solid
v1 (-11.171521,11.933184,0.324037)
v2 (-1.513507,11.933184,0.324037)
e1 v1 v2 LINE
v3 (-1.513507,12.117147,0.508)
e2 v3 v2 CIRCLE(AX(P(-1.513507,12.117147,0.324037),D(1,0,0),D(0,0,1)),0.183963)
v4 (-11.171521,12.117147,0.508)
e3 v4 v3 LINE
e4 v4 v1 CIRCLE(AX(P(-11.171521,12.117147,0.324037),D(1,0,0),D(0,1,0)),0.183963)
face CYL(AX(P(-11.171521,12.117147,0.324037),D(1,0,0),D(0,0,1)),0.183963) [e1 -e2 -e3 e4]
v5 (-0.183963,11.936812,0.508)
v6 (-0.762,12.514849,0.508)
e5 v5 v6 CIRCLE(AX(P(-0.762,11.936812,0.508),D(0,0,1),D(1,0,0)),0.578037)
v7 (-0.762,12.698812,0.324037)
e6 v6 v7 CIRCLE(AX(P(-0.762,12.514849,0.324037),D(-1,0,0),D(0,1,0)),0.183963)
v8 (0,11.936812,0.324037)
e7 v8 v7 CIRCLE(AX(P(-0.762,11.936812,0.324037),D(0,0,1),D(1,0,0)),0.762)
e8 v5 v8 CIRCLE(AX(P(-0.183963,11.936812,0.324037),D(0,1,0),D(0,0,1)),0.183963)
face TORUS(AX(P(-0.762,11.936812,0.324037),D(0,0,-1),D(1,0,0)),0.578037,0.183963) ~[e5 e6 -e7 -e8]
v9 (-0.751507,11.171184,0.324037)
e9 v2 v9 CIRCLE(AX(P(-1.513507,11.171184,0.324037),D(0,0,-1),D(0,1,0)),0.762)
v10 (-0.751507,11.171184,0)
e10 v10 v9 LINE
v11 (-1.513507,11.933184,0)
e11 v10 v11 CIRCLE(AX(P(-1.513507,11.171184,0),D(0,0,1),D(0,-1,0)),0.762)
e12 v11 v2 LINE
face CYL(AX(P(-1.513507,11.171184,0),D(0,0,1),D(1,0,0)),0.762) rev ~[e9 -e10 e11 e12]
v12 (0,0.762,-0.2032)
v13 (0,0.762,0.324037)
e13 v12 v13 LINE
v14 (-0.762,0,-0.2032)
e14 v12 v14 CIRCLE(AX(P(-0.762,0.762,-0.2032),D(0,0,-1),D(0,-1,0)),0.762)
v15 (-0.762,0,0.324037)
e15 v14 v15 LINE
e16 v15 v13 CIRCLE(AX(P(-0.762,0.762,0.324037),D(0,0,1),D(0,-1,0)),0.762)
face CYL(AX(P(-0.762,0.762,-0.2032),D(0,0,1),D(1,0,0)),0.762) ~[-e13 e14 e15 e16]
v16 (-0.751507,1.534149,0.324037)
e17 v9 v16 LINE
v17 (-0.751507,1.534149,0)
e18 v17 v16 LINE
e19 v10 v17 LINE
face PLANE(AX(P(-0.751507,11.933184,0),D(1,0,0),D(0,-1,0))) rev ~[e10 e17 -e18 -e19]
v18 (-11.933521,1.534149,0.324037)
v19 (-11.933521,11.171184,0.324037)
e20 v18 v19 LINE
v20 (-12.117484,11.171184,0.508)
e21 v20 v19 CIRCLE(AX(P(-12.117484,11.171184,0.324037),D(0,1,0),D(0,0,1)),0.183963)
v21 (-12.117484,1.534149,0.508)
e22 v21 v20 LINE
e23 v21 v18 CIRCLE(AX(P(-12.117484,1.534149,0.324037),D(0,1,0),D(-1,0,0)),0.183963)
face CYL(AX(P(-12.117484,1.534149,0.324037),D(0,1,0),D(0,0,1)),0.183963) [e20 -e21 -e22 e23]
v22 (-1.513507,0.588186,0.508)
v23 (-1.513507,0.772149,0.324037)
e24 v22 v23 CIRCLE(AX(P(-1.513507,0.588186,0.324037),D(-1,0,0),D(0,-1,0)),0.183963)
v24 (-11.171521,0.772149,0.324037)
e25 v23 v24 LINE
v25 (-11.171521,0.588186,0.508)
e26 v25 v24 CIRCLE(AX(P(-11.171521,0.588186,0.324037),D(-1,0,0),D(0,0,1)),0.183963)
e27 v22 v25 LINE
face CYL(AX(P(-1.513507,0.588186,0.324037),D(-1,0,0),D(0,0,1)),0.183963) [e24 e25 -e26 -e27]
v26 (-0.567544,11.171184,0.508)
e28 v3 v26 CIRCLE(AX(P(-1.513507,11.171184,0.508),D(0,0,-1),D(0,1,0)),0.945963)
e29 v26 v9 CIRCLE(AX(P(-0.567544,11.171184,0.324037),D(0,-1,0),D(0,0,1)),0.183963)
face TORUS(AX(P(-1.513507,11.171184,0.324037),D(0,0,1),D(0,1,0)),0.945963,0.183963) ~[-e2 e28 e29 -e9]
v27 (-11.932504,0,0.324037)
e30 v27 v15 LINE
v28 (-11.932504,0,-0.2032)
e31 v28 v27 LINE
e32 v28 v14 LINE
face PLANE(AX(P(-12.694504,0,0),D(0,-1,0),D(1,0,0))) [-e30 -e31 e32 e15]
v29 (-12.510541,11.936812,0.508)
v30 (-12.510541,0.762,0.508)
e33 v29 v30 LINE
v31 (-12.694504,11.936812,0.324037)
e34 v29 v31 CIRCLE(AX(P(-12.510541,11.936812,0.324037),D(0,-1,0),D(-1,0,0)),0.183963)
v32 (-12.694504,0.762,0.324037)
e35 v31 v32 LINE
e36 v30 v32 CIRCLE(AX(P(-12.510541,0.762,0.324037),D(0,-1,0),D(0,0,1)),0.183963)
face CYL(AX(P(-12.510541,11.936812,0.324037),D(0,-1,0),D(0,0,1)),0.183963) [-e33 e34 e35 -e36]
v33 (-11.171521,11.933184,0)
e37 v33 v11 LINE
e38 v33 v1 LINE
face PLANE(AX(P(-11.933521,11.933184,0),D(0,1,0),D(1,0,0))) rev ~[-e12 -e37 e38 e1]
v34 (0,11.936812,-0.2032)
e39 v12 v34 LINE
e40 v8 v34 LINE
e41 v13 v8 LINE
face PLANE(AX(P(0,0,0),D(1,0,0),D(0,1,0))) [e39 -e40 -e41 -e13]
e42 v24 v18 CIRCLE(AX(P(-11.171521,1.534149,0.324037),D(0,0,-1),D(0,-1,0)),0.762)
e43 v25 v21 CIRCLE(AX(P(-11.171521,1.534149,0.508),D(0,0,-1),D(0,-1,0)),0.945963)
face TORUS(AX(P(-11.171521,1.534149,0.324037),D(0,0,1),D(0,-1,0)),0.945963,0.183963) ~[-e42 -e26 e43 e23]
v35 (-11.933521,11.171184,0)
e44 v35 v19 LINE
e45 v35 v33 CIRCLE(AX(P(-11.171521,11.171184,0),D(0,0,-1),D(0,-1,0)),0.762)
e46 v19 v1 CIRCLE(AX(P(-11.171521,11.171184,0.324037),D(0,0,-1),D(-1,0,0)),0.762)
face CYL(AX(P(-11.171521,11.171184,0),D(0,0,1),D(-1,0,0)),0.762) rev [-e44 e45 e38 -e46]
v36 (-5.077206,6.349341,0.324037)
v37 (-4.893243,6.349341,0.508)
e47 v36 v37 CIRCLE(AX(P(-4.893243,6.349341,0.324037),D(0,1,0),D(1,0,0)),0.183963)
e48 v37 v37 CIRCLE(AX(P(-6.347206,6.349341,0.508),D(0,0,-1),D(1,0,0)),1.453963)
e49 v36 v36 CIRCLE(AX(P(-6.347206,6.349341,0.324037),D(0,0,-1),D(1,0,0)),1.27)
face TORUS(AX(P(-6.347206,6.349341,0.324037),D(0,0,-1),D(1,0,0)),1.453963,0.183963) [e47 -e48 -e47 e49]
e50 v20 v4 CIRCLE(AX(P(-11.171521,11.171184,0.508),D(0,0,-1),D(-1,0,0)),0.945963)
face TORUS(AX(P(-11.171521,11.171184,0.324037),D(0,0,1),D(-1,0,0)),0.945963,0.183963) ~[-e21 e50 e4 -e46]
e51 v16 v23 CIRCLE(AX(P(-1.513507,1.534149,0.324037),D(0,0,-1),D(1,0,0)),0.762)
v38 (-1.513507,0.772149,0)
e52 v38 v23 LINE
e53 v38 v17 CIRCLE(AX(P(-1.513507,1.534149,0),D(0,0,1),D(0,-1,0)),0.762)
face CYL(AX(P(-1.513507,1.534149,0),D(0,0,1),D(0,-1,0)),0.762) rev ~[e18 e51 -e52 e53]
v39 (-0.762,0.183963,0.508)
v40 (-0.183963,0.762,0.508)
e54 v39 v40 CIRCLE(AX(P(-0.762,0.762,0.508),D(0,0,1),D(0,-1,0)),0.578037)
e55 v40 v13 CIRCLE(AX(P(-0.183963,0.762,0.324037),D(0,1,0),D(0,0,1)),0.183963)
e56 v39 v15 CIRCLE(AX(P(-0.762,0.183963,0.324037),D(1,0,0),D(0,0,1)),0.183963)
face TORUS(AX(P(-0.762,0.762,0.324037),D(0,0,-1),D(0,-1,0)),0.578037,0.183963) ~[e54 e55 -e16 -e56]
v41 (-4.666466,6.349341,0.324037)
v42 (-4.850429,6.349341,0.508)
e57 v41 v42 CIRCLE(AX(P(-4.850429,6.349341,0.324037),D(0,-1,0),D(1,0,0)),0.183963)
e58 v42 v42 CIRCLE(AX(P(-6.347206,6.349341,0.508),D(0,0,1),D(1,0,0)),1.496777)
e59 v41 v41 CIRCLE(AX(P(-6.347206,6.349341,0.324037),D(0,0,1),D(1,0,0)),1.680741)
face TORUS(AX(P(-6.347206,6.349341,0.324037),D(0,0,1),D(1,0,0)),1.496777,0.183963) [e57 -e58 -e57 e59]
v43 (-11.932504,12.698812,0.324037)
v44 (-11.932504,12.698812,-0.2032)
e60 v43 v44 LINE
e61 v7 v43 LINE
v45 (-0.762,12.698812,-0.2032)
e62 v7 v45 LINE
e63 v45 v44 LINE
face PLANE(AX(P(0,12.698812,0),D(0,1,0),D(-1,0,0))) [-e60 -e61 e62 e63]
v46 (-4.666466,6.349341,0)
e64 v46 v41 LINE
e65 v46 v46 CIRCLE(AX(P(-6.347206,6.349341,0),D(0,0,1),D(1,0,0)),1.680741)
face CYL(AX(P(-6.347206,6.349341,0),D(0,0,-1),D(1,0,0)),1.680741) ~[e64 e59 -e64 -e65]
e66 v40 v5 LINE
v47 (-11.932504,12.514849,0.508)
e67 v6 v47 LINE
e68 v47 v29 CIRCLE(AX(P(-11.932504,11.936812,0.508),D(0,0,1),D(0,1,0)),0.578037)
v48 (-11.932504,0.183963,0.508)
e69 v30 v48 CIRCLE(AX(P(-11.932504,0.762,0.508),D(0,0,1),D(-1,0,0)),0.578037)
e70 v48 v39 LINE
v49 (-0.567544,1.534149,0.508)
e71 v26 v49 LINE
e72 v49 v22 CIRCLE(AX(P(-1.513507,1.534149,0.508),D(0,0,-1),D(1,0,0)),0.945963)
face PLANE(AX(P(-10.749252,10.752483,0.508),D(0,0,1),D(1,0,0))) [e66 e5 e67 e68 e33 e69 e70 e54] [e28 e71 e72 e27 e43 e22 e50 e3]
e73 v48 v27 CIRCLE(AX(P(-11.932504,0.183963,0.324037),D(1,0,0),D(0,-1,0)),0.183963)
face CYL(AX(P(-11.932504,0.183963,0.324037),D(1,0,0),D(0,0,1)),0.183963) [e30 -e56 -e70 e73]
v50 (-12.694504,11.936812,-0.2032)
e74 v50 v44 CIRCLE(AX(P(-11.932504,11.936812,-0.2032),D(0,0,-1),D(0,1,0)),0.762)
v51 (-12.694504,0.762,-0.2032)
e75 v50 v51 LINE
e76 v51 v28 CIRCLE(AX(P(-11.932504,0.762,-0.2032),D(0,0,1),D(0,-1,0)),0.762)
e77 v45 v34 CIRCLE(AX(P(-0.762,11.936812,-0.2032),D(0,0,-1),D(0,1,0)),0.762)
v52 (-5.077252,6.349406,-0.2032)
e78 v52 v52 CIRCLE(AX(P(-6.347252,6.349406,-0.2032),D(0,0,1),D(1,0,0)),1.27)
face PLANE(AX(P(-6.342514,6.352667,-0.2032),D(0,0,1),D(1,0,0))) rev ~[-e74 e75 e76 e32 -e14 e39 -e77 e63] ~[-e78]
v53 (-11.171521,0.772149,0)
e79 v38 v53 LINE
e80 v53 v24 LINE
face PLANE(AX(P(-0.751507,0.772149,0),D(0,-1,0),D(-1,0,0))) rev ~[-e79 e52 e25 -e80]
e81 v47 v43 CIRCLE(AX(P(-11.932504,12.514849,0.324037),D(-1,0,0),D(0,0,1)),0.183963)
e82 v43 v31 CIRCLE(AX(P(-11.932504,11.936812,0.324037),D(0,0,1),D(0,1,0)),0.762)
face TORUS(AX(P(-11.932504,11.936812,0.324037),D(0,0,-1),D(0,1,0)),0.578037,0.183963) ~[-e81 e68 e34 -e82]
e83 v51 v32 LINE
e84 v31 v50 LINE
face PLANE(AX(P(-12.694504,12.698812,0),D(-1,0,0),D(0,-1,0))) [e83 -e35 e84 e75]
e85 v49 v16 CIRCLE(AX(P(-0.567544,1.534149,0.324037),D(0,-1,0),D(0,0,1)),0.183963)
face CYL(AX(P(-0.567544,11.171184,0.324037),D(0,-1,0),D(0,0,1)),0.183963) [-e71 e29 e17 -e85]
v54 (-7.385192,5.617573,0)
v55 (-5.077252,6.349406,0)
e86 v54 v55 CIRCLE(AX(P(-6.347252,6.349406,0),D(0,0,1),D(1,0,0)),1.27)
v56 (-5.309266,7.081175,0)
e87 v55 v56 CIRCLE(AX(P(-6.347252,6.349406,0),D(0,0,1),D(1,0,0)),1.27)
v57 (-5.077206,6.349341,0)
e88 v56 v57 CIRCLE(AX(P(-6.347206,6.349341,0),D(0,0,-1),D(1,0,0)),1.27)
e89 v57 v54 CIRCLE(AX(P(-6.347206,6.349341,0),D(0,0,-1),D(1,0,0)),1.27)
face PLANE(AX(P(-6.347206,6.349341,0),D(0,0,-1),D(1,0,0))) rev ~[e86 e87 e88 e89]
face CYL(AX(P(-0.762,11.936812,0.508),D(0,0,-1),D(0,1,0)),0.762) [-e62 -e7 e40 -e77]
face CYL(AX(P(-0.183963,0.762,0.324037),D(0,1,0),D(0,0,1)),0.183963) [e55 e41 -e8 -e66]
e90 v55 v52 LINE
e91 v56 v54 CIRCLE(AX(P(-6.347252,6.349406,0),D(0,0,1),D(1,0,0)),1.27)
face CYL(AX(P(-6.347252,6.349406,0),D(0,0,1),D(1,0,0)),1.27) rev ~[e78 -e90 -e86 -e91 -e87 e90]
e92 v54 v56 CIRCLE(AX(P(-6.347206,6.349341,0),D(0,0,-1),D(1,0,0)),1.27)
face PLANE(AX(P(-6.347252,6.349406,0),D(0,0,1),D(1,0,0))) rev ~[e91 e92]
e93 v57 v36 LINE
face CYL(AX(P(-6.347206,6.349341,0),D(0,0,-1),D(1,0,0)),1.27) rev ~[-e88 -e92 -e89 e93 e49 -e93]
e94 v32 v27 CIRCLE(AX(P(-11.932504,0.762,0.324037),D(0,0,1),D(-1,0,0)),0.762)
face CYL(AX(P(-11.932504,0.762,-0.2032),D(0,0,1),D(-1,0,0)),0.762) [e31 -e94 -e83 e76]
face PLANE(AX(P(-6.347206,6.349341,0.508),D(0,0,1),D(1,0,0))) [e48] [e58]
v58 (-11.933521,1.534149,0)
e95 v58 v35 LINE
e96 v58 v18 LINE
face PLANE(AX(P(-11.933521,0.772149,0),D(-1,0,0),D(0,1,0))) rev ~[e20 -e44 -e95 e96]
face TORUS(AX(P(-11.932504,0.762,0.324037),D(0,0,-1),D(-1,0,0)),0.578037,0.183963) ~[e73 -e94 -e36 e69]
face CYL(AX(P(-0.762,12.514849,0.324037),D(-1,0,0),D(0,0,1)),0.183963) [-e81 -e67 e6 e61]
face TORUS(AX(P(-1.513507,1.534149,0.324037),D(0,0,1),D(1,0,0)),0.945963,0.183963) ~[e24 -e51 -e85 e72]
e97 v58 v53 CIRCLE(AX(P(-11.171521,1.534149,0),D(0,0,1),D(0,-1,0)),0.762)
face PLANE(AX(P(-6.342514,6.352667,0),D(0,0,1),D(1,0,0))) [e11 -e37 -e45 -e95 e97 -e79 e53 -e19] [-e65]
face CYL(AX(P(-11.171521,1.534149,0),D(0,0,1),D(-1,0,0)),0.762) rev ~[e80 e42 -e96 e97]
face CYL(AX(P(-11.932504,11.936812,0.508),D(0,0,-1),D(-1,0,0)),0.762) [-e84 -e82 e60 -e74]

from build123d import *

# Parameters (mm, degrees)
F1_DEPTH = 0.508
F2_DEPTH = 0.2032
F3_R     = 0.762
F5_R     = 1.6807405663
F6_DEPTH = 0.508
F7_D     = 2.54
F7_DEPTH = 0.509
F8_D     = 2.54
F8_DEPTH = 0.2042
F9_R     = 0.1839630735


with BuildPart() as f1:
    # F0 (on Top) → F1 (new body)
    with BuildSketch(Plane.XY):
        Polygon((-12.694504112, 12.6988124102), (-12.694504112, 6.3494062051), (-11.9335213676, 6.3494062051), (-11.9335213676, 11.9331842288), (-6.347252056, 11.9331842288), (-6.347252056, 12.6988124102), align=None)
        Polygon((-0.7515071775, 6.3494062051), (0, 6.3494062051), (0, 12.6988124102), (-6.347252056, 12.6988124102), (-6.347252056, 11.9331842288), (-0.7515071775, 11.9331842288), align=None)
        Polygon((-6.347252056, 0), (0, 0), (0, 6.3494062051), (-0.7515071775, 6.3494062051), (-0.7515071775, 0.7721490692), (-6.347252056, 0.7721490692), align=None)
        Polygon((-12.694504112, 0), (-6.347252056, 0), (-6.347252056, 0.7721490692), (-11.9335213676, 0.7721490692), (-11.9335213676, 6.3494062051), (-12.694504112, 6.3494062051), align=None)
    extrude(amount=F1_DEPTH)

    # F0 (on Top) → F2 (join)
    with BuildSketch(Plane.XY):
        Polygon((-11.9335213676, 0.7721490692), (-6.347252056, 0.7721490692), (-0.7515071775, 0.7721490692), (-0.7515071775, 6.3494062051), (-0.7515071775, 11.9331842288), (-6.347252056, 11.9331842288), (-11.9335213676, 11.9331842288), (-11.9335213676, 6.3494062051), align=None)
        Polygon((-12.694504112, 12.6988124102), (-12.694504112, 6.3494062051), (-11.9335213676, 6.3494062051), (-11.9335213676, 11.9331842288), (-6.347252056, 11.9331842288), (-6.347252056, 12.6988124102), align=None)
        Polygon((-12.694504112, 0), (-6.347252056, 0), (-6.347252056, 0.7721490692), (-11.9335213676, 0.7721490692), (-11.9335213676, 6.3494062051), (-12.694504112, 6.3494062051), align=None)
        Polygon((-6.347252056, 0), (0, 0), (0, 6.3494062051), (-0.7515071775, 6.3494062051), (-0.7515071775, 0.7721490692), (-6.347252056, 0.7721490692), align=None)
        Polygon((-0.7515071775, 6.3494062051), (0, 6.3494062051), (0, 12.6988124102), (-6.347252056, 12.6988124102), (-6.347252056, 11.9331842288), (-0.7515071775, 11.9331842288), align=None)
    extrude(amount=-F2_DEPTH)

    # F3
    f3_edges = [f1.edges().sort_by_distance(p)[0] for p in [
        (0, 0, 0.1524),
        (0, 12.698812, 0.1524),
        (-12.694504, 12.698812, 0.1524),
        (-12.694504, 0, 0.1524),
        (-11.933521, 11.933184, 0.254),
        (-11.933521, 0.772149, 0.254),
        (-0.751507, 11.933184, 0.254),
        (-0.751507, 0.772149, 0.254),
    ]]
    fillet(f3_edges, radius=F3_R)

    # F5 (on offset) → F6 (join)
    with BuildSketch(Plane.XY):
        with Locations((-6.3472064212, 6.3493414782)):
            Circle(F5_R)
    extrude(amount=F6_DEPTH)

    # F7 (through all, one way)
    with BuildSketch(Plane(origin=(0, 0, 0), x_dir=(1, 0, 0), z_dir=(0, 0, -1))):
        with Locations((-6.3472064212, -6.3493414782)):
            Circle(F7_D / 2)
    extrude(amount=-F7_DEPTH, mode=Mode.SUBTRACT)

    # F8 (through all, one way)
    with BuildSketch(Plane.XY):
        with Locations((-6.347252056, 6.3494062051)):
            Circle(F8_D / 2)
    extrude(amount=-F8_DEPTH, mode=Mode.SUBTRACT)

    # F9
    f9_edges = [f1.edges().sort_by_distance(p)[0] for p in [
        (-8.027947, 6.349341, 0.508),
        (0, 6.349406, 0.508),
        (-0.751507, 6.352667, 0.508),
        (-12.694504, 6.349406, 0.508),
        (-12.471319, 12.475628, 0.508),
        (-12.471319, 0.223185, 0.508),
        (-6.347252, 12.698812, 0.508),
        (-6.347252, 0, 0.508),
        (-0.223185, 12.475628, 0.508),
        (-0.223185, 0.223185, 0.508),
        (-6.342514, 11.933184, 0.508),
        (-11.710337, 11.71, 0.508),
        (-0.974692, 11.71, 0.508),
        (-11.933521, 6.352667, 0.508),
        (-11.710337, 0.995334, 0.508),
        (-0.974692, 0.995334, 0.508),
        (-6.342514, 0.772149, 0.508),
        (-7.617206, 6.349341, 0.508),
    ]]
    fillet(f9_edges, radius=F9_R)


solid = f1.part
